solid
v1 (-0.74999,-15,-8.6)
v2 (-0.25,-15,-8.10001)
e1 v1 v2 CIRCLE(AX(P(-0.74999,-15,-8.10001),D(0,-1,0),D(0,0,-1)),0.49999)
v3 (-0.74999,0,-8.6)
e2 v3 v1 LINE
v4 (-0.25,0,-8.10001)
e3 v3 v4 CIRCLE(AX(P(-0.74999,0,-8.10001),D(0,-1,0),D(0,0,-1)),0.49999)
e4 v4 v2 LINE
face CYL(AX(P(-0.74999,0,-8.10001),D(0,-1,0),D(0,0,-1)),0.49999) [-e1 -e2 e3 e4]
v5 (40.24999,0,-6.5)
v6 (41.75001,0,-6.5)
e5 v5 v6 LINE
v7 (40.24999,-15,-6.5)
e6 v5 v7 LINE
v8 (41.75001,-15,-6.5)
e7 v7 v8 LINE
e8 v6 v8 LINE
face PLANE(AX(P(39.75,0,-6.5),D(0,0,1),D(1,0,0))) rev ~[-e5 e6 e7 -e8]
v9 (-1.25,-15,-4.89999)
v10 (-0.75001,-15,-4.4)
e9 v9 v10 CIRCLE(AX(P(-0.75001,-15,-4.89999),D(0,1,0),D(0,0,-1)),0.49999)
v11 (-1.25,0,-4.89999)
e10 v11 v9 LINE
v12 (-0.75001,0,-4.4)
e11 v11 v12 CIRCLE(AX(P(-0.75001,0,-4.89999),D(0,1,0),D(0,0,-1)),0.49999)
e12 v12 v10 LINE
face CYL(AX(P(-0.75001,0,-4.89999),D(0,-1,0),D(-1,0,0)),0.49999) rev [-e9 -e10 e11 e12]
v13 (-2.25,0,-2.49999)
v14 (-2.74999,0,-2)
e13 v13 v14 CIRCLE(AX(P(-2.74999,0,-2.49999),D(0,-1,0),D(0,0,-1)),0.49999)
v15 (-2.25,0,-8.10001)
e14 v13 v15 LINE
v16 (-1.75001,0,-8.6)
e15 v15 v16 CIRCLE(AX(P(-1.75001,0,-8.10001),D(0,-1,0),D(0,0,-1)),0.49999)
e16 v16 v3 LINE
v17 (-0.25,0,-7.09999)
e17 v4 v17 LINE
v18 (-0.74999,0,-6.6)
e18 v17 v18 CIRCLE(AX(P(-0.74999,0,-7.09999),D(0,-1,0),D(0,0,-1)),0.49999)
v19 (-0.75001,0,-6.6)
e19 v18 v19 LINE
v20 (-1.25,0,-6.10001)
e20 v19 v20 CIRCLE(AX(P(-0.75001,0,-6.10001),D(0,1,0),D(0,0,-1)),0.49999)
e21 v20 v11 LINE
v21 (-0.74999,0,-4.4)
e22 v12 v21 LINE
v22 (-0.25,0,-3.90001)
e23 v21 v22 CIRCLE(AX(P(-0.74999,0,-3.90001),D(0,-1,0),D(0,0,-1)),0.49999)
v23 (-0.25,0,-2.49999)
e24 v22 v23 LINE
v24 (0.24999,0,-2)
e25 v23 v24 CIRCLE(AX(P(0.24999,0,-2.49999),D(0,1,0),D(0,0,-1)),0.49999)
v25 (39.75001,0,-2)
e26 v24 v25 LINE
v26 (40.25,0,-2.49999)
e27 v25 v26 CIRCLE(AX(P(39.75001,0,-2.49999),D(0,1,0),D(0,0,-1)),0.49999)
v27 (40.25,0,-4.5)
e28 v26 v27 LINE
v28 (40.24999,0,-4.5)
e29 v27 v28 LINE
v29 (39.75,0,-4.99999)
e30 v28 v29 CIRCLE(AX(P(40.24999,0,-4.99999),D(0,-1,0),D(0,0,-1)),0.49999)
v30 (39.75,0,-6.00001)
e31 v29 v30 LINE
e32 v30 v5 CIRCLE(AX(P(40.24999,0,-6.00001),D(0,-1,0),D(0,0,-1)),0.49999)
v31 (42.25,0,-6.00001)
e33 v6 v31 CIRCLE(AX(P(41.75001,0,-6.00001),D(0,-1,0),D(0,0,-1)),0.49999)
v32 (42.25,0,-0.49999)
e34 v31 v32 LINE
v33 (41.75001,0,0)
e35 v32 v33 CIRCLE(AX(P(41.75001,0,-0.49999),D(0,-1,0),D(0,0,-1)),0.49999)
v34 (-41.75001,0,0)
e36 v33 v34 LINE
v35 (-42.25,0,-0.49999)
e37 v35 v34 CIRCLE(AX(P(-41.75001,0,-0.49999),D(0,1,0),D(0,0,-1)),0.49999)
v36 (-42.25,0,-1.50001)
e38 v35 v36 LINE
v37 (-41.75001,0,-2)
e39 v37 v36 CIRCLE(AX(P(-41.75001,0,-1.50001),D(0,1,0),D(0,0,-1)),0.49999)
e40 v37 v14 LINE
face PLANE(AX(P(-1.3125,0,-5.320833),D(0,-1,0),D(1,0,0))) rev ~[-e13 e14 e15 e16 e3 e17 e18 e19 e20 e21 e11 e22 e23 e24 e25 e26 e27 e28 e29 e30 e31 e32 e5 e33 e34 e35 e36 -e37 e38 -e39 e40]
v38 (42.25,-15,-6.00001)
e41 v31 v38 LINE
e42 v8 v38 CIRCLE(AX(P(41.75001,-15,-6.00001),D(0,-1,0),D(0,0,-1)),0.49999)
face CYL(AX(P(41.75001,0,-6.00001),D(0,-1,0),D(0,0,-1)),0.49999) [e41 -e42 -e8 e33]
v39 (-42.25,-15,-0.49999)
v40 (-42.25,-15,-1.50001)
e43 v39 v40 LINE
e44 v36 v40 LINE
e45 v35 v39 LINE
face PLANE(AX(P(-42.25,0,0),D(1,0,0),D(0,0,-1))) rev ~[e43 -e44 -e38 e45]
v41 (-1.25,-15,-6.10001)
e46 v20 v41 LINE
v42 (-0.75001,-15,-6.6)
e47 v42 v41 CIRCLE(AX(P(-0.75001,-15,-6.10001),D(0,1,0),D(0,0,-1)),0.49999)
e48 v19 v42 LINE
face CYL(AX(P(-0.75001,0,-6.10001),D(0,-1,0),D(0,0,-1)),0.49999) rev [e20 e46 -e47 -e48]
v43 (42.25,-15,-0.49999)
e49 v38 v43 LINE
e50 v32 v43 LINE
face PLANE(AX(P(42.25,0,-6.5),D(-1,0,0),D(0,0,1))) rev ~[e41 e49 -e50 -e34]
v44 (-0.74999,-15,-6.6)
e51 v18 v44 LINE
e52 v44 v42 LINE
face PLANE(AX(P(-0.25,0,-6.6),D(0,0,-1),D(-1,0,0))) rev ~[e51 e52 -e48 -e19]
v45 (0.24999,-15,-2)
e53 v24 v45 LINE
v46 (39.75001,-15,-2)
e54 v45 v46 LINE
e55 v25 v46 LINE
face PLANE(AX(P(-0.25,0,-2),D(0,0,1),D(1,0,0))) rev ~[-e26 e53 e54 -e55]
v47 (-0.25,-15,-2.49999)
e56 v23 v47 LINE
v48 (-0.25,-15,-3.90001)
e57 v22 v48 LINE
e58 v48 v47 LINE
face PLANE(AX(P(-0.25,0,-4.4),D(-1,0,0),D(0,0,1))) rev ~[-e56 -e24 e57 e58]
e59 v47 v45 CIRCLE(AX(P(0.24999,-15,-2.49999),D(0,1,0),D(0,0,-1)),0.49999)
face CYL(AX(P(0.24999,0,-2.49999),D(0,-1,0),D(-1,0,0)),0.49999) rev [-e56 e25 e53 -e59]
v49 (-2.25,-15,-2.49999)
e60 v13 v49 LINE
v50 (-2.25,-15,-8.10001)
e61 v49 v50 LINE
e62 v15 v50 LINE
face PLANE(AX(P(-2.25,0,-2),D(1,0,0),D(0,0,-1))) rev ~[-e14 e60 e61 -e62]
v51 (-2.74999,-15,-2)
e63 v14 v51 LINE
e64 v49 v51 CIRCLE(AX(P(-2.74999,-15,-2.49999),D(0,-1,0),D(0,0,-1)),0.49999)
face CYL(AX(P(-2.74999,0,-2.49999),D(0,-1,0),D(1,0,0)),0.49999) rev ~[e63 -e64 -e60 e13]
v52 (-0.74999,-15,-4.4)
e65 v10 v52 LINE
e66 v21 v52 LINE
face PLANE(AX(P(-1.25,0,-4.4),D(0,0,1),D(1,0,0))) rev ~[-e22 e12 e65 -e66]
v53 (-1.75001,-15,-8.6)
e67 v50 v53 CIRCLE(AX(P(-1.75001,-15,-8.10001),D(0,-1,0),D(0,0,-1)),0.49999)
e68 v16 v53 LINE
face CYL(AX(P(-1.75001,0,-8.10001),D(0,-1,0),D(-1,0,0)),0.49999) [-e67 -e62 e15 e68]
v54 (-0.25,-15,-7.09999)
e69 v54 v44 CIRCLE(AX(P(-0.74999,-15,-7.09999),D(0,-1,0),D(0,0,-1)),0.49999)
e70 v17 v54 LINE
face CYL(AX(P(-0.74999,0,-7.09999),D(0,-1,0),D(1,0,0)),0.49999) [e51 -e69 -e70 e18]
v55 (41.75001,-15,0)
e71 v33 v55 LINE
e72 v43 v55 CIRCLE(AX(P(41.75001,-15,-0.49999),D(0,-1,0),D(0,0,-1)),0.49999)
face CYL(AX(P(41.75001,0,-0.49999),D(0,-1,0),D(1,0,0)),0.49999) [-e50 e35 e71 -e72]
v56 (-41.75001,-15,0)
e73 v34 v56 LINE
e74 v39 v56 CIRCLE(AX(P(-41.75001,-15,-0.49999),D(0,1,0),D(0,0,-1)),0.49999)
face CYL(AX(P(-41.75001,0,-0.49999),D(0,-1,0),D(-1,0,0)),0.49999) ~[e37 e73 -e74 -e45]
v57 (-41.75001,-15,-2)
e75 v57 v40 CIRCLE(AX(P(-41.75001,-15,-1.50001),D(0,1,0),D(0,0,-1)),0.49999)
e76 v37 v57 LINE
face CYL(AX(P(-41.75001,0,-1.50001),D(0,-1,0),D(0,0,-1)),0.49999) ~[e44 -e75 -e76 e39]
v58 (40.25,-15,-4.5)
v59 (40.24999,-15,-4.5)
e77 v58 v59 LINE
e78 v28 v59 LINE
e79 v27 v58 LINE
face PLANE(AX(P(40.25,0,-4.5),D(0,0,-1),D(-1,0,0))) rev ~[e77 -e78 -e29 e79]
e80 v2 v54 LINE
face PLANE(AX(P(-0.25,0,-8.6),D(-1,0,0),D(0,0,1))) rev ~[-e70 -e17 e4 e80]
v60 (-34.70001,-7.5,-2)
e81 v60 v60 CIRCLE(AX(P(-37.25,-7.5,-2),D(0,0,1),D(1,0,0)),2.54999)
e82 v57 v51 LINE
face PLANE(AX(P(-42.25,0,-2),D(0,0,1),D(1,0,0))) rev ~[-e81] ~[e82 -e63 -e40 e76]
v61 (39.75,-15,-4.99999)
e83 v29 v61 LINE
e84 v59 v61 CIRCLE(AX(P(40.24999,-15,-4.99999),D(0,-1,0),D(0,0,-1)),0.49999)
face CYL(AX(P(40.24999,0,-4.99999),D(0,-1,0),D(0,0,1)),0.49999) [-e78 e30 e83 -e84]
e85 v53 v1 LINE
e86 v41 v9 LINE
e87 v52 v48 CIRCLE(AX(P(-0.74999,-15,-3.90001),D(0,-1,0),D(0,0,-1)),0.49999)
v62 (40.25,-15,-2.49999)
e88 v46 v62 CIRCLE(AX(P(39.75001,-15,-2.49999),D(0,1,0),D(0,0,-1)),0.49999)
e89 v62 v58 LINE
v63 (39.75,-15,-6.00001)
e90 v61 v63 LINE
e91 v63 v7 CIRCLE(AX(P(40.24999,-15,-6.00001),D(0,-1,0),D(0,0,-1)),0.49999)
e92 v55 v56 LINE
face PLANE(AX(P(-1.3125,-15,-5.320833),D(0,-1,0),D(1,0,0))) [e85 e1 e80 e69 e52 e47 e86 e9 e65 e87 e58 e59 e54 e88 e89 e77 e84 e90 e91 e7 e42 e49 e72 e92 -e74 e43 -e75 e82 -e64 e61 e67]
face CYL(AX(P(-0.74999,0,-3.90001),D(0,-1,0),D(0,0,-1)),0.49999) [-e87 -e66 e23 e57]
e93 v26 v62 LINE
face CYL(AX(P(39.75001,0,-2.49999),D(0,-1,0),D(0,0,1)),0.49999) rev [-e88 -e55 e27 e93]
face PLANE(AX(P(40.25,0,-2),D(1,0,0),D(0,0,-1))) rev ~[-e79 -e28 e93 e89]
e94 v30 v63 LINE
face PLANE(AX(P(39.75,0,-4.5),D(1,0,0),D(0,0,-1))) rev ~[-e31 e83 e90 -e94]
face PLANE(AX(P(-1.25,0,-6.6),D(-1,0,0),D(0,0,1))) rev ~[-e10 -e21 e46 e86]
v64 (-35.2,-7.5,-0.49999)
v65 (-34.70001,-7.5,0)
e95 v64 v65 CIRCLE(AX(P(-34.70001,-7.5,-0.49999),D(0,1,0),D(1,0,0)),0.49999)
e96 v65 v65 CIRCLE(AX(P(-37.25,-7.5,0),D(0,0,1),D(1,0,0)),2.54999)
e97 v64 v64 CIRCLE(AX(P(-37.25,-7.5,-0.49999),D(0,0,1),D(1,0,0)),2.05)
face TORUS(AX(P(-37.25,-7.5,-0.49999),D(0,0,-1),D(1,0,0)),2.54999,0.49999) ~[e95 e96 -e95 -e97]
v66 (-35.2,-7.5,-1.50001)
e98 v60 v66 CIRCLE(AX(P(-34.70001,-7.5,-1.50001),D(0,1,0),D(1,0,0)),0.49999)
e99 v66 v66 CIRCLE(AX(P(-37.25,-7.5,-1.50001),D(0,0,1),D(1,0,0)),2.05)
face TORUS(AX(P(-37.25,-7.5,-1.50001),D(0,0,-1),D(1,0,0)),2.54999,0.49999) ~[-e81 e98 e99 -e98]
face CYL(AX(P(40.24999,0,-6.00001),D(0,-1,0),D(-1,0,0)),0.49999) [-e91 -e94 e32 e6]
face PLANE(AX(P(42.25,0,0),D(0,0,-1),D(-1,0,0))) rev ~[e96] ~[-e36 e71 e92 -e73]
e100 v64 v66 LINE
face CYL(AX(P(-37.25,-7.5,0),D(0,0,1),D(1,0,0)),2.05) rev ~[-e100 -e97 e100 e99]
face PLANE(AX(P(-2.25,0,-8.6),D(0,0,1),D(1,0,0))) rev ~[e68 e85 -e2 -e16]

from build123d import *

# Parameters (mm, degrees)
F1_DEPTH = 15
F2_R     = 2.05
F3_DEPTH = 25
F4_R     = 0.49999


# Not quite as in the source:
# - a fillet or chamfer is up to 0.001 mm smaller than in the source, because OpenCascade refuses the exact size


with BuildPart() as f1:
    # F0 (on Front) → F1 (new body)
    with BuildSketch(Plane.XZ):
        Polygon((-0.25, -2), (-2.25, -2), (-2.25, -8.6), (-0.25, -8.6), (-0.25, -6.6), (-1.25, -6.6), (-1.25, -4.4), (-0.25, -4.4), align=None)
        Polygon((42.25, 0), (-42.25, 0), (-42.25, -2), (-2.25, -2), (-0.25, -2), (40.25, -2), (42.25, -2), align=None)
        Polygon((42.25, -6.5), (42.25, -2), (40.25, -2), (40.25, -4.5), (39.75, -4.5), (39.75, -6.5), align=None)
    extrude(amount=F1_DEPTH)

    # F2 (on face) → F3 (cut)
    with BuildSketch(Plane.XY):
        with Locations((-37.25, -7.5)):
            Circle(F2_R)
    extrude(amount=-F3_DEPTH, mode=Mode.SUBTRACT)

    # F4 (radius 0.5 in the source; OpenCascade refuses exactly that, so slightly less here)
    f4_edges = [f1.edges().sort_by_distance(p)[0] for p in [
        (-1.25, -7.5, -6.6),
        (-0.25, -7.5, -8.6),
        (39.75, -7.5, -6.5),
        (39.75, -7.5, -4.5),
        (-39.3, -7.5, 0),
        (42.25, -7.5, 0),
        (42.25, -7.5, -6.5),
        (-42.25, -7.5, 0),
        (-42.25, -7.5, -2),
        (-2.25, -7.5, -2),
        (-0.25, -7.5, -2),
        (40.25, -7.5, -2),
        (-2.25, -7.5, -8.6),
        (-39.3, -7.5, -2),
        (-0.25, -7.5, -4.4),
        (-1.25, -7.5, -4.4),
        (-0.25, -7.5, -6.6),
    ]]
    fillet(f4_edges, radius=F4_R)


solid = f1.part
